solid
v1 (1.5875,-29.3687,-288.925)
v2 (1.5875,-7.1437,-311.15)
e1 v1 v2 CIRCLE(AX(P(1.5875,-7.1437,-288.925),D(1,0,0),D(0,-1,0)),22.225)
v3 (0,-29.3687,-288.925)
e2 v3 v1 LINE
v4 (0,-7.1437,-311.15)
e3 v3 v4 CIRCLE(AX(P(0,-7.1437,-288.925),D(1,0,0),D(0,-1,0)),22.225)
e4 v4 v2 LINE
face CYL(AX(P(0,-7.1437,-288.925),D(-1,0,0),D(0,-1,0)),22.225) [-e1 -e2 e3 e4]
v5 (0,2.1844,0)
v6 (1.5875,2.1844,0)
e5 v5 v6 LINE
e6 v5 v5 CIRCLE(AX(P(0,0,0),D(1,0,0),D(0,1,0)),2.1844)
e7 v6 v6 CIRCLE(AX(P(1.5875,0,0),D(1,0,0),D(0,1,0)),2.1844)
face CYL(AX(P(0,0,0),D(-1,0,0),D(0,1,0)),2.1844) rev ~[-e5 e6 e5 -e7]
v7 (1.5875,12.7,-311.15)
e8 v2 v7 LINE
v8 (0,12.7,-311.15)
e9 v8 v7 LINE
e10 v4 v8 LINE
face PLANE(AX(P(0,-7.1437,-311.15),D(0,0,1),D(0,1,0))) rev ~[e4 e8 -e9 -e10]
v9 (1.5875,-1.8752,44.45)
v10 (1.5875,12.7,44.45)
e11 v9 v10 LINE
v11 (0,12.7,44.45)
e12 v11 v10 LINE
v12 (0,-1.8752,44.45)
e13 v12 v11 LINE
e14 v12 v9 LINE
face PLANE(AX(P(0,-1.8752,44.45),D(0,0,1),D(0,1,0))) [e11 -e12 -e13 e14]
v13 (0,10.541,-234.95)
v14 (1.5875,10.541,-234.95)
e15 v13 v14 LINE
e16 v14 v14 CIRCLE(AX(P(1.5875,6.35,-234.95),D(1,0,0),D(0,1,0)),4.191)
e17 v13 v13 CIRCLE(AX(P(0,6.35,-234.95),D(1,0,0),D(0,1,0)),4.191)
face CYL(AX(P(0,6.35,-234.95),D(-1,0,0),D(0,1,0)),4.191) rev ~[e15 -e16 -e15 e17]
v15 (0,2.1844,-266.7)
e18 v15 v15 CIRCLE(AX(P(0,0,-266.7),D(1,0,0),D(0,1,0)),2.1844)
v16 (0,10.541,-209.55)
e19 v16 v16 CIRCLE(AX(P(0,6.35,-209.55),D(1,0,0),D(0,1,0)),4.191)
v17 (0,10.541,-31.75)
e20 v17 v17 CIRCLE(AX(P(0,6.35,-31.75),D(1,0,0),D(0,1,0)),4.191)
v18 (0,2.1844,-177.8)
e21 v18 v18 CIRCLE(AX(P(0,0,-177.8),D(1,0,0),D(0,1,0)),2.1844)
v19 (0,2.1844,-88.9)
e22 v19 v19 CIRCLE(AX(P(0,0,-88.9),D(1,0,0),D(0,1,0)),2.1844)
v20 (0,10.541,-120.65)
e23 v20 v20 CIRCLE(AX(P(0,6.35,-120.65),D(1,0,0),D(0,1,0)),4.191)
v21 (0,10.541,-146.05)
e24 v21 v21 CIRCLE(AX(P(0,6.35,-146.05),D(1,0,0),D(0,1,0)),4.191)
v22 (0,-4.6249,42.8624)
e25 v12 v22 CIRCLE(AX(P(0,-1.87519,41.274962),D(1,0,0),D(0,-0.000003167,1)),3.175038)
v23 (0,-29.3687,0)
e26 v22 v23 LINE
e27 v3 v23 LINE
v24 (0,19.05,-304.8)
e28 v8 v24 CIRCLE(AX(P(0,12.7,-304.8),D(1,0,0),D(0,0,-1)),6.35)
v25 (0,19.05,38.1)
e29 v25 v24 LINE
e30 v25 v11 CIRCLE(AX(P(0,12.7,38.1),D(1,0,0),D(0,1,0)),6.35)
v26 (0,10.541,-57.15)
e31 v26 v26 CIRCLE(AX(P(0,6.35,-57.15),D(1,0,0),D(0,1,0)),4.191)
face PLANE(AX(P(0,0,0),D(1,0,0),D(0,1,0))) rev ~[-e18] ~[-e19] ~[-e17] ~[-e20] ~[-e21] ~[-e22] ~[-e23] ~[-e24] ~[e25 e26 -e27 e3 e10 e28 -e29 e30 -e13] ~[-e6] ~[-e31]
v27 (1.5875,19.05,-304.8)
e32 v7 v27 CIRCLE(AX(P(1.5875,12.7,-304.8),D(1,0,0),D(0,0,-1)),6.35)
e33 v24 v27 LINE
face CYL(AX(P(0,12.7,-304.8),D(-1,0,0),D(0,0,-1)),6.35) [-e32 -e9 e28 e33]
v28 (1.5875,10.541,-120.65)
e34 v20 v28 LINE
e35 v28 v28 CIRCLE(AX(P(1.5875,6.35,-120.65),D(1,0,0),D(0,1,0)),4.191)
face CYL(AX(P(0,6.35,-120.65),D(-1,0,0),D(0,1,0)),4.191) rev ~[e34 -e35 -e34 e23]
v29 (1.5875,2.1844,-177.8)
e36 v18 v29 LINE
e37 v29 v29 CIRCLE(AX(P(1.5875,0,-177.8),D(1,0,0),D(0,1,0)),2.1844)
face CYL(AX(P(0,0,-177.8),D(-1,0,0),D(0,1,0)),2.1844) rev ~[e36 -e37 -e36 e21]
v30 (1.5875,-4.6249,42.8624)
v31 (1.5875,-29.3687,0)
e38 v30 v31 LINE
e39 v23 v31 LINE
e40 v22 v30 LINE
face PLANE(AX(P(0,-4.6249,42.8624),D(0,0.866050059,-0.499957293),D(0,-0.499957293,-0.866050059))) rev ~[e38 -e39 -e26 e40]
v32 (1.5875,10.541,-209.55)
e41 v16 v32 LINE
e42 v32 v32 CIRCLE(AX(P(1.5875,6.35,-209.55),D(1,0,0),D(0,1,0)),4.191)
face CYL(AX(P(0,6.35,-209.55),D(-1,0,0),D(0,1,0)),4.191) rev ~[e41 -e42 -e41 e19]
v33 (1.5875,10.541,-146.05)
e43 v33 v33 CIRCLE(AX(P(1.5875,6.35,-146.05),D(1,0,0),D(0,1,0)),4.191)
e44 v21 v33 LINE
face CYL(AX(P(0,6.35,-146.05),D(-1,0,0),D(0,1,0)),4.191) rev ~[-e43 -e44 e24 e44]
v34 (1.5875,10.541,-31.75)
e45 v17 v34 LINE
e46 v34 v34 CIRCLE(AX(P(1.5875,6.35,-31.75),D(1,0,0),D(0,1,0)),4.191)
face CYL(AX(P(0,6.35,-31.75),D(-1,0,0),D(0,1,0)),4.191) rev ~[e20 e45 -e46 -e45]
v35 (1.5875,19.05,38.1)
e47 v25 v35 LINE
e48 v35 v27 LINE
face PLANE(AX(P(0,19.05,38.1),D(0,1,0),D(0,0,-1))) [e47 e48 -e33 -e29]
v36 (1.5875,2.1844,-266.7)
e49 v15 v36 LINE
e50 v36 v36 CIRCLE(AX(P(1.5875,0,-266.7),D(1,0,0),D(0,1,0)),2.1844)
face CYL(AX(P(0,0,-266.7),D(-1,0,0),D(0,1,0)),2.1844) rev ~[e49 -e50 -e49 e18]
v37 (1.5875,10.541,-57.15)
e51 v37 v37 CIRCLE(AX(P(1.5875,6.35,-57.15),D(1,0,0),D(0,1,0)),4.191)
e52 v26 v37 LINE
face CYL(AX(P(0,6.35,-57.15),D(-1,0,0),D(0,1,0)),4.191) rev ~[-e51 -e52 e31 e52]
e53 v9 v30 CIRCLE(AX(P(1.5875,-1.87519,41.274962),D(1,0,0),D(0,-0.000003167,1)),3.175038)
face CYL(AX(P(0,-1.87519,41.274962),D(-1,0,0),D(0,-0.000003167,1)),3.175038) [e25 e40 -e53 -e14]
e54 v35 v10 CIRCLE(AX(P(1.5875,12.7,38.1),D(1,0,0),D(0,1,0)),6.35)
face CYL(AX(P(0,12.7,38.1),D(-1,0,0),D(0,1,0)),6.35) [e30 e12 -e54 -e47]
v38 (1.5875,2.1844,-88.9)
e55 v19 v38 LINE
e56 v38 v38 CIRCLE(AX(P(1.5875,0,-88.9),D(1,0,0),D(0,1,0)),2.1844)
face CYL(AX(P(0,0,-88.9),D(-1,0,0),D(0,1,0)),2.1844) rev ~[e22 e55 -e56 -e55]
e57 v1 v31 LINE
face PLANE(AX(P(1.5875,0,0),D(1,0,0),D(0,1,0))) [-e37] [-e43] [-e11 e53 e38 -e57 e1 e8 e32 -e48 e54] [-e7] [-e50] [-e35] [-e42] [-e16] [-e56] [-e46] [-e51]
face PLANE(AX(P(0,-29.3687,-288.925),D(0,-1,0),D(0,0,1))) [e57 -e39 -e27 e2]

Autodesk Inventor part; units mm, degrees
ref_plane "YZ Plane" through (0, 0, 0) normal (1, 0, 0) x (0, 1, 0)
ref_plane "XZ Plane" through (0, 0, 0) normal (0, 1, 0) x (-1, 0, 0)
ref_plane "XY Plane" through (0, 0, 0) normal (0, 0, 1) x (1, 0, 0)
sketch "main" plane through (0, 0, 0) normal (0, 0, 1) x (1, 0, 0)
  circle A0 centre (-6.8277, 139.0371) radius 2.1844
  circle A1 centre (-0.4777, 107.2871) radius 4.191
  line L0 (-8.7029, 183.4871) -> (6.7737, 183.4871)
  circle A2 centre (-6.8277, 50.1371) radius 2.1844
  circle A3 centre (-6.8277, -38.7629) radius 2.1844
  circle A4 centre (-6.8277, -127.6629) radius 2.1844
  circle A5 centre (-0.4777, 81.8871) radius 4.191
  circle A6 centre (-0.4777, 18.3871) radius 4.191
  line L1 (-36.1964, -149.8879) -> (-36.1964, 139.0371)
  circle A7 centre (-0.4777, -70.5129) radius 4.191
  circle A8 centre (-0.4777, -95.9129) radius 4.191
  line L2 (6.7053, -172.1129) -> (5.8723, -172.1129)
  line L3 (-13.9714, -172.1129) -> (6.7053, -172.1129)
  arc A9 (-36.1964, -149.8879) -> (-13.9714, -172.1129) centre (-13.9714, -149.8879) ccw
  circle A10 centre (-0.4777, -7.0129) radius 4.191
  line L4 (-11.4526, 181.8995) -> (-36.1964, 139.0371)
  arc A11 (-8.7029, 183.4871) -> (-11.4526, 181.8995) centre (-8.7029, 180.3121) ccw
  line L5 (-8.7029, 183.4871) -> (5.8723, 183.4871)
  line L6 (12.2223, 177.1371) -> (12.2223, -165.7629)
  arc A12 (12.2223, 177.1371) -> (5.8723, 183.4871) centre (5.8723, 177.1371) ccw
  arc A13 (5.8723, -172.1129) -> (12.2223, -165.7629) centre (5.8723, -165.7629) ccw
  point P0 (2.0753, 1.669)
  point P1 (-10.536, 183.4871)
  point P2 (5.8723, 139.0371)
  point P3 (12.2223, 183.4871)
  dimension "d4" = 8.382
  dimension "d5" = 8.382
  dimension "d6" = 8.382
  dimension "d7" = 8.382
  dimension "d8" = 8.382
  dimension "d9" = 8.382
  dimension "d10" = 12.7
  dimension "d11" = 0
  dimension "d12" = 88.9
  dimension "d13" = 88.9
  dimension "d14" = 88.9
  dimension "d15" = 29.3687
  dimension "d16" = 3.175
  dimension "d18" = 6.35
  dimension "d19" = 6.35
  dimension "d20" = 22.225
sketch "Sketch1" plane through (0, 0, 0) normal (1, 0, 0) x (0, 1, 0)
  circle A0 centre (0, 0) radius 2.1844
  circle A1 centre (6.35, -31.75) radius 4.191
  line L0 (-1.8752, 44.45) -> (13.6014, 44.45)
  circle A2 centre (0, -88.9) radius 2.1844
  circle A3 centre (0, -177.8) radius 2.1844
  circle A4 centre (0, -266.7) radius 2.1844
  circle A5 centre (6.35, -57.15) radius 4.191
  circle A6 centre (6.35, -120.65) radius 4.191
  line L1 (-29.3687, -288.925) -> (-29.3687, 0)
  circle A7 centre (6.35, -209.55) radius 4.191
  circle A8 centre (6.35, -234.95) radius 4.191
  line L2 (13.533, -311.15) -> (12.7, -311.15)
  line L3 (-7.1437, -311.15) -> (13.533, -311.15)
  arc A9 (-29.3687, -288.925) -> (-7.1437, -311.15) centre (-7.1437, -288.925) ccw
  circle A10 centre (6.35, -146.05) radius 4.191
  line L4 (-4.6249, 42.8624) -> (-29.3687, 0)
  arc A11 (-1.8752, 44.45) -> (-4.6249, 42.8624) centre (-1.8752, 41.275) ccw
  line L5 (-1.8752, 44.45) -> (12.7, 44.45)
  line L6 (19.05, 38.1) -> (19.05, -304.8)
  arc A12 (19.05, 38.1) -> (12.7, 44.45) centre (12.7, 38.1) ccw
  arc A13 (12.7, -311.15) -> (19.05, -304.8) centre (12.7, -304.8) ccw
extrude "Extrusion1" add sketch "Sketch1" along normal blind 1.5875
properties part number "Skirt" material "Acetal Resin, White"
